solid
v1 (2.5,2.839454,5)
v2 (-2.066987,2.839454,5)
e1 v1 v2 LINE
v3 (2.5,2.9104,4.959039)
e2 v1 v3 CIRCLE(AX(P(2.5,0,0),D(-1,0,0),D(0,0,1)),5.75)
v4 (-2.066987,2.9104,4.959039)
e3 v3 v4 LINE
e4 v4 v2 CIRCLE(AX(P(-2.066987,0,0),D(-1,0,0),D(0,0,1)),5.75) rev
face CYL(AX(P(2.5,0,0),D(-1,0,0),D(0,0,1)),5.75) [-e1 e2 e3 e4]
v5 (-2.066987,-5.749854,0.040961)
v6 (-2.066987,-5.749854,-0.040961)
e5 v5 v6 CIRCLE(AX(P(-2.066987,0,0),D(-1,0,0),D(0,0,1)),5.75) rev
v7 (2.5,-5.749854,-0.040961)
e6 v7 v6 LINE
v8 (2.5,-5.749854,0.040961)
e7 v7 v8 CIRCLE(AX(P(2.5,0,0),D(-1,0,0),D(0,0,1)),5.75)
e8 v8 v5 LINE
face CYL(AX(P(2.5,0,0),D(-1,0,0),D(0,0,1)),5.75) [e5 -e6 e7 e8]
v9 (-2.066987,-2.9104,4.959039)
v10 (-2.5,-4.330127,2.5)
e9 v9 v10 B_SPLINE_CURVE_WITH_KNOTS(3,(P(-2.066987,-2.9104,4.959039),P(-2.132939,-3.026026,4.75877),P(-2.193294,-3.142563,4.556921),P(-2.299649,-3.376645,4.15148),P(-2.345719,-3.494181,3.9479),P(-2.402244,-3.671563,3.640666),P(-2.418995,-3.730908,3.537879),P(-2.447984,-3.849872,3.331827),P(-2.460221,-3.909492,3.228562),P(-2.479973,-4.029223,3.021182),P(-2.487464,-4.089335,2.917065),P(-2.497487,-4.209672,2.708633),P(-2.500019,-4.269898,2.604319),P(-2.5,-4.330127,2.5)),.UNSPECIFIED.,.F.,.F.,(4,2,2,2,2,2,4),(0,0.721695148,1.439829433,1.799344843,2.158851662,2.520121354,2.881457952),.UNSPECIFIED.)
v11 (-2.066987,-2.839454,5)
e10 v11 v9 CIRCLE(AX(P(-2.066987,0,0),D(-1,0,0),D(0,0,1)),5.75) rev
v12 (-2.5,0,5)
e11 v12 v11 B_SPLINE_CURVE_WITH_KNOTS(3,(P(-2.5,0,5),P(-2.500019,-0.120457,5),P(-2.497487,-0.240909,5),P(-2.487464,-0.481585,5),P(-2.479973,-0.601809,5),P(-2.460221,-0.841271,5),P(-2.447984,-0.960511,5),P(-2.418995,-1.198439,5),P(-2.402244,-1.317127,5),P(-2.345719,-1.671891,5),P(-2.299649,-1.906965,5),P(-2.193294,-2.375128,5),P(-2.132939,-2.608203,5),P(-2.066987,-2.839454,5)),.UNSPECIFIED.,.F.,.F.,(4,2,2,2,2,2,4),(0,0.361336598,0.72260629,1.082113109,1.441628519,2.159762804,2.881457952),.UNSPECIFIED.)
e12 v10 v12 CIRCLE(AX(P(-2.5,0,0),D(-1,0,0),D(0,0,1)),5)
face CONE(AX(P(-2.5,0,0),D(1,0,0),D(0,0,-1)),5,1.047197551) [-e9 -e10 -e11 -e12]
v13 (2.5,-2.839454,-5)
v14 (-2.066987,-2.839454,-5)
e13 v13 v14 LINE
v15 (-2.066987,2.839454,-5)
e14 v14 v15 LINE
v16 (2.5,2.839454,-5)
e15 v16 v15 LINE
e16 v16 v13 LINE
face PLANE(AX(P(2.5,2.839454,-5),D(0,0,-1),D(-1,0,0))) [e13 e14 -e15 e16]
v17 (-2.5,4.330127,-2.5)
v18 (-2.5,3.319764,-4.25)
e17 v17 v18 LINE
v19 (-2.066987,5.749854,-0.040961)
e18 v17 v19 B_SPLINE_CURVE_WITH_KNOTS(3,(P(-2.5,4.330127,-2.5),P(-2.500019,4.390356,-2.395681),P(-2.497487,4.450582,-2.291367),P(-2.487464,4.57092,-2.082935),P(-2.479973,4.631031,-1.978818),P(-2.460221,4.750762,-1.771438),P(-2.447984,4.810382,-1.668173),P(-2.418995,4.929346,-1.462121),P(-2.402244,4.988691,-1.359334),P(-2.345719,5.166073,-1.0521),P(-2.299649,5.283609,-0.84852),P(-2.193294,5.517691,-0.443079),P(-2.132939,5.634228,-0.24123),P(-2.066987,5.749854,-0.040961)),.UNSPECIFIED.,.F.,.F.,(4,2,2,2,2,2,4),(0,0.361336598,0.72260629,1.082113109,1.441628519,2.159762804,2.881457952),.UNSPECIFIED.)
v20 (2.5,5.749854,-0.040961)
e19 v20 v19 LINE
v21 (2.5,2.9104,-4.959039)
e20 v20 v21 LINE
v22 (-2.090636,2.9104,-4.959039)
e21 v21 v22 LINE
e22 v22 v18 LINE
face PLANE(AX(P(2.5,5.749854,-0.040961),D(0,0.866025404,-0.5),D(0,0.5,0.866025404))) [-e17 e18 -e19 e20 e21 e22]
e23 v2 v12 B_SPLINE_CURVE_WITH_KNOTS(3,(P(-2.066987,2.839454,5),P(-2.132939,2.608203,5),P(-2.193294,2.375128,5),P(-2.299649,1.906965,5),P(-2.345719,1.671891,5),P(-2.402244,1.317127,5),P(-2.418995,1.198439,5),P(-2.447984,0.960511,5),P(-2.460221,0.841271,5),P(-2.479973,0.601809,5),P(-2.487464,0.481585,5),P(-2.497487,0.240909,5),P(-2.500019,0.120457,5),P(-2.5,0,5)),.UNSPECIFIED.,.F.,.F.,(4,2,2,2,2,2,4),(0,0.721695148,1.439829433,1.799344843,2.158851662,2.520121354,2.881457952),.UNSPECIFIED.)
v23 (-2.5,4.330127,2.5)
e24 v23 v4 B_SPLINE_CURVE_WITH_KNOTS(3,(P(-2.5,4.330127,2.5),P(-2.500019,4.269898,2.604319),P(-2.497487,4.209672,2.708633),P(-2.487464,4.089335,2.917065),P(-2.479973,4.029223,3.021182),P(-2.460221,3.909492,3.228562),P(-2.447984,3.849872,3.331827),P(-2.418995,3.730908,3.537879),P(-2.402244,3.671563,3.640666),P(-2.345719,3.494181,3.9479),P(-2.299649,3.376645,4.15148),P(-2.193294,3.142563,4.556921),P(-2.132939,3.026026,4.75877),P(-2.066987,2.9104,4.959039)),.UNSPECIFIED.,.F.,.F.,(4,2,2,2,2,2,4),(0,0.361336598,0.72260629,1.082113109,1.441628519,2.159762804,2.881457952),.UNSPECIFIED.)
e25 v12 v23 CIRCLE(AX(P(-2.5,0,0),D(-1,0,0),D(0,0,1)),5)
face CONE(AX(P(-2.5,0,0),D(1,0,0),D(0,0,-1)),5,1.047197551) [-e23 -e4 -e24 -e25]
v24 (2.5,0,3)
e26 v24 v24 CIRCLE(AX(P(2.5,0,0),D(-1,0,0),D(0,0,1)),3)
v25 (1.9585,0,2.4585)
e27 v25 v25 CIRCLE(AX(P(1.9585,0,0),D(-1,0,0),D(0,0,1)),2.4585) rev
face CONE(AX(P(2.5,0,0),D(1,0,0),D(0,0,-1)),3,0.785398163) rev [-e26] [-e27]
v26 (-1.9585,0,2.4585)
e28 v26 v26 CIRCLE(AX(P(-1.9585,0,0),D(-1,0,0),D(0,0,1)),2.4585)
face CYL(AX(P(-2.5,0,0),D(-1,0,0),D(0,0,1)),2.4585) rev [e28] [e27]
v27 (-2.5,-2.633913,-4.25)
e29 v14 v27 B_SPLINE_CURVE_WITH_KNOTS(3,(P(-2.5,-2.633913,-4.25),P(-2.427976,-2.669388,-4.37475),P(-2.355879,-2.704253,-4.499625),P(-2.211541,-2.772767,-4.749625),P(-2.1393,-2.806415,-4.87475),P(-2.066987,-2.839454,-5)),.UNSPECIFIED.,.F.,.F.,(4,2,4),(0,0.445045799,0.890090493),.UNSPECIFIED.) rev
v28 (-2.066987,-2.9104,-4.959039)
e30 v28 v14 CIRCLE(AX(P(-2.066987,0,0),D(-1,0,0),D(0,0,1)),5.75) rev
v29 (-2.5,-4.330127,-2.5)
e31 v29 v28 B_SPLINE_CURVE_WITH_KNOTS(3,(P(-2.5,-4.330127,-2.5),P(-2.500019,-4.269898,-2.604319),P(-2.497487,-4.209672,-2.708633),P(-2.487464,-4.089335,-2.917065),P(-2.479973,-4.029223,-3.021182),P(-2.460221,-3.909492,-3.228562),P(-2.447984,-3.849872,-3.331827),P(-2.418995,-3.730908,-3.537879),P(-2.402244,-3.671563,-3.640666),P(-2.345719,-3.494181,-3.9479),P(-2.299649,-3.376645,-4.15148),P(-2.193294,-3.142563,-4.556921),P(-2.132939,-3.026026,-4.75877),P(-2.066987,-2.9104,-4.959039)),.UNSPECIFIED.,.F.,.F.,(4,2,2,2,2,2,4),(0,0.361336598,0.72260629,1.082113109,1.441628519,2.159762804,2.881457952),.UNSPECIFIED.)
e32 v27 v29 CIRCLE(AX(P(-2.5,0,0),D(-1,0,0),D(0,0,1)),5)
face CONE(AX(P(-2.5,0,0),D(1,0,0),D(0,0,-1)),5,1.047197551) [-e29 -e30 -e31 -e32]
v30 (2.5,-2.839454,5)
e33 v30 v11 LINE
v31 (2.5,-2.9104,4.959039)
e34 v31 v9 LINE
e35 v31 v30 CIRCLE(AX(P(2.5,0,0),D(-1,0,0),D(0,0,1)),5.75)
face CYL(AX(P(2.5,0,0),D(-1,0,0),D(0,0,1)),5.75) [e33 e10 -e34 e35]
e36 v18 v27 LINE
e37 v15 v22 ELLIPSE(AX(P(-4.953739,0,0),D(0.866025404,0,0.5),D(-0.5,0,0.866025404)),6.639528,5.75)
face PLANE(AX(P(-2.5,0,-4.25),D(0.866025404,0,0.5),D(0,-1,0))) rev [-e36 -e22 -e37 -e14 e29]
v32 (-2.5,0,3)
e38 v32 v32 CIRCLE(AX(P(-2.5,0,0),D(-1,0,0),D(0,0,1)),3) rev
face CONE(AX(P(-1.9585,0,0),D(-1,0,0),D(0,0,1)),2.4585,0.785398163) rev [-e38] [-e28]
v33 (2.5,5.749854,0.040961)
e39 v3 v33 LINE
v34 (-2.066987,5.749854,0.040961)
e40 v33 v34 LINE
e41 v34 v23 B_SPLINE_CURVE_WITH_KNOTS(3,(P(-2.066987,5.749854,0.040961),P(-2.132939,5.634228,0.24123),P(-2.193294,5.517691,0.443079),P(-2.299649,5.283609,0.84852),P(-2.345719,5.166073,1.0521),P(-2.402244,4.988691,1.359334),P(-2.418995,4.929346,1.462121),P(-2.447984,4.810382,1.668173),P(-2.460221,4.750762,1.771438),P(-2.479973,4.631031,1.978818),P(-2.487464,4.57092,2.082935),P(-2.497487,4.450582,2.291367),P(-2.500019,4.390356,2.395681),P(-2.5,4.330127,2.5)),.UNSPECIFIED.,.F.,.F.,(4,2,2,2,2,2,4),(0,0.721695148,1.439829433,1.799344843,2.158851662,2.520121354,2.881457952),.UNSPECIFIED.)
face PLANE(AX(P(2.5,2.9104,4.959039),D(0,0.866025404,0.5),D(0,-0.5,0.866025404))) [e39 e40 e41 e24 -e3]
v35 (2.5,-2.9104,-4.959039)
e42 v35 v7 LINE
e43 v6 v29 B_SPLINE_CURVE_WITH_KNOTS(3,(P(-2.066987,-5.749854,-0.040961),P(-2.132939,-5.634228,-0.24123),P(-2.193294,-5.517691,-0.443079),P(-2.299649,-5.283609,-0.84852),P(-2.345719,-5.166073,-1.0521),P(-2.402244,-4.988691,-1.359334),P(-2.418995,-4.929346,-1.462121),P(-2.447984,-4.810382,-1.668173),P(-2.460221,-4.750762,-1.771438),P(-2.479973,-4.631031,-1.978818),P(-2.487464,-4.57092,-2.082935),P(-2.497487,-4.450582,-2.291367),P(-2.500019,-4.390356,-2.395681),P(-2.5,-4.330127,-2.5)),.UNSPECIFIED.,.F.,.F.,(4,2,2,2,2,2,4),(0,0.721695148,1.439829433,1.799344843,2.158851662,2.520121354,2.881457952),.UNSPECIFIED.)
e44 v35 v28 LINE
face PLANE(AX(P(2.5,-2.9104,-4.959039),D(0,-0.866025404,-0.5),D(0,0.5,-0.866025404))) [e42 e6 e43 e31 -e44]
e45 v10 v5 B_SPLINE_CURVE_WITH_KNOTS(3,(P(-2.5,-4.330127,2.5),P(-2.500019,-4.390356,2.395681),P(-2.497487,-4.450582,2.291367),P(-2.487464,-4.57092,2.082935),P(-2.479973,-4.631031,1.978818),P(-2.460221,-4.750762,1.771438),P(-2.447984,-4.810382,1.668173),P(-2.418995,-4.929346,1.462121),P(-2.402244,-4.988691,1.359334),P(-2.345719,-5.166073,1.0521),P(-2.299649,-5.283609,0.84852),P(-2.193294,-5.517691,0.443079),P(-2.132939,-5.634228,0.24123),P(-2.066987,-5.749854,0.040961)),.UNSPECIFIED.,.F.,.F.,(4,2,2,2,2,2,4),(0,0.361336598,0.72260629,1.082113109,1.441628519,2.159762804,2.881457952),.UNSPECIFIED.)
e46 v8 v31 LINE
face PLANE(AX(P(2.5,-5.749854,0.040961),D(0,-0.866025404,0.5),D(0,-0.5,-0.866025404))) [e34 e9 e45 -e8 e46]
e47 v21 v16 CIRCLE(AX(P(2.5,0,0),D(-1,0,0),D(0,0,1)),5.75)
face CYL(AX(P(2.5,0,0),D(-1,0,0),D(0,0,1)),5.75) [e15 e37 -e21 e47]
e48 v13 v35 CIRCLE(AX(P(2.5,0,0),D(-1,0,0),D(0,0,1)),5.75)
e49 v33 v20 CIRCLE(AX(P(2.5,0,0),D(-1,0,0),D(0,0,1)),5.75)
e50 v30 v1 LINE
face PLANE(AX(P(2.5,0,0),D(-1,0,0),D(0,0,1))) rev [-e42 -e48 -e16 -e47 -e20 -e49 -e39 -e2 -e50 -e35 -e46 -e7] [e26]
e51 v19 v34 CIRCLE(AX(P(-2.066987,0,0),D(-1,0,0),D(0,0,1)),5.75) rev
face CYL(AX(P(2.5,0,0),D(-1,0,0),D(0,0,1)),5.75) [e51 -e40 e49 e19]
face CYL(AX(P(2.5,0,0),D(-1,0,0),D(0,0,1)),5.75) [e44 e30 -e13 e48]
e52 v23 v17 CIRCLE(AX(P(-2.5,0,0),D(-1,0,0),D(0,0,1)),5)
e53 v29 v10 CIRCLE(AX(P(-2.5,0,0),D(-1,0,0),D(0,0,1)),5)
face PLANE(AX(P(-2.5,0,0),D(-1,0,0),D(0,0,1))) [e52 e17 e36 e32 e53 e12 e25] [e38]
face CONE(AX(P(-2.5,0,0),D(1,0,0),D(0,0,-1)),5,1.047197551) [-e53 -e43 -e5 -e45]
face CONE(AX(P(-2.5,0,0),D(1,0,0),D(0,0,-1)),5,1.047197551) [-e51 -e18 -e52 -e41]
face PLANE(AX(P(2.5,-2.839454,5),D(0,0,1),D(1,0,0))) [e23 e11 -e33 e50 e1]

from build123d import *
from OCP.BRepFilletAPI import BRepFilletAPI_MakeChamfer

# Parameters (mm, degrees)
BOSS_EXTRUDE1_DEPTH = 5
HOLE1_D             = 4.917
CHAMFER1_SIZE       = 0.75
CHAMFER1_SIZE_2     = 0.433012702
CHAMFER2_SIZE       = 0.5415


with BuildPart() as part:
    # Sketch1 → Boss-Extrude1 (new body)
    with BuildSketch(Plane(origin=(-2.5, 0, 0), x_dir=(0, -1, 0), z_dir=(-1, 0, 0))):
        with BuildLine():
            Line((5.749854105, 0.040960553), (2.910399932, 4.959039447))
            ThreePointArc((2.910399932, 4.959039447), (2.875, 4.979646072), (2.839454173, 5))
            Line((2.839454173, 5), (-2.839454173, 5))
            ThreePointArc((-2.839454173, 5), (-2.875, 4.979646072), (-2.910399932, 4.959039447))
            Line((-2.910399932, 4.959039447), (-5.749854105, 0.040960553))
            ThreePointArc((-5.749854105, 0.040960553), (-5.75, 0), (-5.749854105, -0.040960553))
            Line((-5.749854105, -0.040960553), (-2.910399932, -4.959039447))
            ThreePointArc((-2.910399932, -4.959039447), (-2.875, -4.979646072), (-2.839454173, -5))
            Line((-2.839454173, -5), (2.839454173, -5))
            ThreePointArc((2.839454173, -5), (2.875, -4.979646072), (2.910399932, -4.959039447))
            Line((2.910399932, -4.959039447), (5.749854105, -0.040960553))
            ThreePointArc((5.749854105, -0.040960553), (5.75, 0), (5.749854105, 0.040960553))
        make_face()
    extrude(amount=-BOSS_EXTRUDE1_DEPTH)

    # Hole1 (through all)
    with Locations(Plane.ZY.offset(2.5)):
        with Locations((0, 0)):
            Hole(HOLE1_D / 2)

    # Chamfer1
    chamfer1_edges_1 = [part.edges().sort_by_distance(p)[0] for p in [
        (-2.5, -5.75, 0),
    ]]
    chamfer1_side_1 = [part.faces().sort_by_distance(p)[0] for p in [
        (-2.5, -5.741339746, 0),
    ]]
    chamfer1_edges_2 = [part.edges().sort_by_distance(p)[0] for p in [
        (-2.5, 5.75, 0),
    ]]
    chamfer1_side_2 = [part.faces().sort_by_distance(p)[0] for p in [
        (-2.491339746, 5.75, 0),
    ]]
    chamfer1_edges_3 = [part.edges().sort_by_distance(p)[0] for p in [
        (-2.5, 0, -5),
    ]]
    chamfer1_side_3 = [part.faces().sort_by_distance(p)[0] for p in [
        (-2.5, 0, -4.991339746),
    ]]
    chamfer1_edges_4 = [part.edges().sort_by_distance(p)[0] for p in [
        (-2.5, -2.875, -4.979646072),
    ]]
    chamfer1_side_4 = [part.faces().sort_by_distance(p)[0] for p in [
        (-2.5, -2.870669873, -4.972146072),
    ]]
    chamfer1_edges_5 = [part.edges().sort_by_distance(p)[0] for p in [
        (-2.5, 2.875, 4.979646072),
    ]]
    chamfer1_side_5 = [part.faces().sort_by_distance(p)[0] for p in [
        (-2.5, 2.870669873, 4.972146072),
    ]]
    chamfer1_edges_6 = [part.edges().sort_by_distance(p)[0] for p in [
        (-2.5, -2.875, 4.979646072),
    ]]
    chamfer1_side_6 = [part.faces().sort_by_distance(p)[0] for p in [
        (-2.5, -2.870669873, 4.972146072),
    ]]
    chamfer1 = BRepFilletAPI_MakeChamfer(part.part.solid().wrapped)
    for e in chamfer1_edges_1:
        chamfer1.Add(CHAMFER1_SIZE - 0.0001, CHAMFER1_SIZE_2 - 0.0001, e.wrapped, chamfer1_side_1[0].wrapped)
    for e in chamfer1_edges_2:
        chamfer1.Add(CHAMFER1_SIZE_2 - 0.0001, CHAMFER1_SIZE - 0.0001, e.wrapped, chamfer1_side_2[0].wrapped)
    for e in chamfer1_edges_3:
        chamfer1.Add(CHAMFER1_SIZE - 0.0001, CHAMFER1_SIZE_2 - 0.0001, e.wrapped, chamfer1_side_3[0].wrapped)
    for e in chamfer1_edges_4:
        chamfer1.Add(CHAMFER1_SIZE - 0.0001, CHAMFER1_SIZE_2 - 0.0001, e.wrapped, chamfer1_side_4[0].wrapped)
    for e in chamfer1_edges_5:
        chamfer1.Add(CHAMFER1_SIZE - 0.0001, CHAMFER1_SIZE_2 - 0.0001, e.wrapped, chamfer1_side_5[0].wrapped)
    for e in chamfer1_edges_6:
        chamfer1.Add(CHAMFER1_SIZE - 0.0001, CHAMFER1_SIZE_2 - 0.0001, e.wrapped, chamfer1_side_6[0].wrapped)
    add(Compound.cast(chamfer1.Shape()), mode=Mode.REPLACE)  # a hair under: the kernel refuses the full size

    # Chamfer2
    chamfer2_edges = [part.edges().sort_by_distance(p)[0] for p in [
        (-2.5, 0, 2.4585),
        (2.5, 0, 2.4585),
    ]]
    chamfer(chamfer2_edges, length=CHAMFER2_SIZE)


solid = part.part
